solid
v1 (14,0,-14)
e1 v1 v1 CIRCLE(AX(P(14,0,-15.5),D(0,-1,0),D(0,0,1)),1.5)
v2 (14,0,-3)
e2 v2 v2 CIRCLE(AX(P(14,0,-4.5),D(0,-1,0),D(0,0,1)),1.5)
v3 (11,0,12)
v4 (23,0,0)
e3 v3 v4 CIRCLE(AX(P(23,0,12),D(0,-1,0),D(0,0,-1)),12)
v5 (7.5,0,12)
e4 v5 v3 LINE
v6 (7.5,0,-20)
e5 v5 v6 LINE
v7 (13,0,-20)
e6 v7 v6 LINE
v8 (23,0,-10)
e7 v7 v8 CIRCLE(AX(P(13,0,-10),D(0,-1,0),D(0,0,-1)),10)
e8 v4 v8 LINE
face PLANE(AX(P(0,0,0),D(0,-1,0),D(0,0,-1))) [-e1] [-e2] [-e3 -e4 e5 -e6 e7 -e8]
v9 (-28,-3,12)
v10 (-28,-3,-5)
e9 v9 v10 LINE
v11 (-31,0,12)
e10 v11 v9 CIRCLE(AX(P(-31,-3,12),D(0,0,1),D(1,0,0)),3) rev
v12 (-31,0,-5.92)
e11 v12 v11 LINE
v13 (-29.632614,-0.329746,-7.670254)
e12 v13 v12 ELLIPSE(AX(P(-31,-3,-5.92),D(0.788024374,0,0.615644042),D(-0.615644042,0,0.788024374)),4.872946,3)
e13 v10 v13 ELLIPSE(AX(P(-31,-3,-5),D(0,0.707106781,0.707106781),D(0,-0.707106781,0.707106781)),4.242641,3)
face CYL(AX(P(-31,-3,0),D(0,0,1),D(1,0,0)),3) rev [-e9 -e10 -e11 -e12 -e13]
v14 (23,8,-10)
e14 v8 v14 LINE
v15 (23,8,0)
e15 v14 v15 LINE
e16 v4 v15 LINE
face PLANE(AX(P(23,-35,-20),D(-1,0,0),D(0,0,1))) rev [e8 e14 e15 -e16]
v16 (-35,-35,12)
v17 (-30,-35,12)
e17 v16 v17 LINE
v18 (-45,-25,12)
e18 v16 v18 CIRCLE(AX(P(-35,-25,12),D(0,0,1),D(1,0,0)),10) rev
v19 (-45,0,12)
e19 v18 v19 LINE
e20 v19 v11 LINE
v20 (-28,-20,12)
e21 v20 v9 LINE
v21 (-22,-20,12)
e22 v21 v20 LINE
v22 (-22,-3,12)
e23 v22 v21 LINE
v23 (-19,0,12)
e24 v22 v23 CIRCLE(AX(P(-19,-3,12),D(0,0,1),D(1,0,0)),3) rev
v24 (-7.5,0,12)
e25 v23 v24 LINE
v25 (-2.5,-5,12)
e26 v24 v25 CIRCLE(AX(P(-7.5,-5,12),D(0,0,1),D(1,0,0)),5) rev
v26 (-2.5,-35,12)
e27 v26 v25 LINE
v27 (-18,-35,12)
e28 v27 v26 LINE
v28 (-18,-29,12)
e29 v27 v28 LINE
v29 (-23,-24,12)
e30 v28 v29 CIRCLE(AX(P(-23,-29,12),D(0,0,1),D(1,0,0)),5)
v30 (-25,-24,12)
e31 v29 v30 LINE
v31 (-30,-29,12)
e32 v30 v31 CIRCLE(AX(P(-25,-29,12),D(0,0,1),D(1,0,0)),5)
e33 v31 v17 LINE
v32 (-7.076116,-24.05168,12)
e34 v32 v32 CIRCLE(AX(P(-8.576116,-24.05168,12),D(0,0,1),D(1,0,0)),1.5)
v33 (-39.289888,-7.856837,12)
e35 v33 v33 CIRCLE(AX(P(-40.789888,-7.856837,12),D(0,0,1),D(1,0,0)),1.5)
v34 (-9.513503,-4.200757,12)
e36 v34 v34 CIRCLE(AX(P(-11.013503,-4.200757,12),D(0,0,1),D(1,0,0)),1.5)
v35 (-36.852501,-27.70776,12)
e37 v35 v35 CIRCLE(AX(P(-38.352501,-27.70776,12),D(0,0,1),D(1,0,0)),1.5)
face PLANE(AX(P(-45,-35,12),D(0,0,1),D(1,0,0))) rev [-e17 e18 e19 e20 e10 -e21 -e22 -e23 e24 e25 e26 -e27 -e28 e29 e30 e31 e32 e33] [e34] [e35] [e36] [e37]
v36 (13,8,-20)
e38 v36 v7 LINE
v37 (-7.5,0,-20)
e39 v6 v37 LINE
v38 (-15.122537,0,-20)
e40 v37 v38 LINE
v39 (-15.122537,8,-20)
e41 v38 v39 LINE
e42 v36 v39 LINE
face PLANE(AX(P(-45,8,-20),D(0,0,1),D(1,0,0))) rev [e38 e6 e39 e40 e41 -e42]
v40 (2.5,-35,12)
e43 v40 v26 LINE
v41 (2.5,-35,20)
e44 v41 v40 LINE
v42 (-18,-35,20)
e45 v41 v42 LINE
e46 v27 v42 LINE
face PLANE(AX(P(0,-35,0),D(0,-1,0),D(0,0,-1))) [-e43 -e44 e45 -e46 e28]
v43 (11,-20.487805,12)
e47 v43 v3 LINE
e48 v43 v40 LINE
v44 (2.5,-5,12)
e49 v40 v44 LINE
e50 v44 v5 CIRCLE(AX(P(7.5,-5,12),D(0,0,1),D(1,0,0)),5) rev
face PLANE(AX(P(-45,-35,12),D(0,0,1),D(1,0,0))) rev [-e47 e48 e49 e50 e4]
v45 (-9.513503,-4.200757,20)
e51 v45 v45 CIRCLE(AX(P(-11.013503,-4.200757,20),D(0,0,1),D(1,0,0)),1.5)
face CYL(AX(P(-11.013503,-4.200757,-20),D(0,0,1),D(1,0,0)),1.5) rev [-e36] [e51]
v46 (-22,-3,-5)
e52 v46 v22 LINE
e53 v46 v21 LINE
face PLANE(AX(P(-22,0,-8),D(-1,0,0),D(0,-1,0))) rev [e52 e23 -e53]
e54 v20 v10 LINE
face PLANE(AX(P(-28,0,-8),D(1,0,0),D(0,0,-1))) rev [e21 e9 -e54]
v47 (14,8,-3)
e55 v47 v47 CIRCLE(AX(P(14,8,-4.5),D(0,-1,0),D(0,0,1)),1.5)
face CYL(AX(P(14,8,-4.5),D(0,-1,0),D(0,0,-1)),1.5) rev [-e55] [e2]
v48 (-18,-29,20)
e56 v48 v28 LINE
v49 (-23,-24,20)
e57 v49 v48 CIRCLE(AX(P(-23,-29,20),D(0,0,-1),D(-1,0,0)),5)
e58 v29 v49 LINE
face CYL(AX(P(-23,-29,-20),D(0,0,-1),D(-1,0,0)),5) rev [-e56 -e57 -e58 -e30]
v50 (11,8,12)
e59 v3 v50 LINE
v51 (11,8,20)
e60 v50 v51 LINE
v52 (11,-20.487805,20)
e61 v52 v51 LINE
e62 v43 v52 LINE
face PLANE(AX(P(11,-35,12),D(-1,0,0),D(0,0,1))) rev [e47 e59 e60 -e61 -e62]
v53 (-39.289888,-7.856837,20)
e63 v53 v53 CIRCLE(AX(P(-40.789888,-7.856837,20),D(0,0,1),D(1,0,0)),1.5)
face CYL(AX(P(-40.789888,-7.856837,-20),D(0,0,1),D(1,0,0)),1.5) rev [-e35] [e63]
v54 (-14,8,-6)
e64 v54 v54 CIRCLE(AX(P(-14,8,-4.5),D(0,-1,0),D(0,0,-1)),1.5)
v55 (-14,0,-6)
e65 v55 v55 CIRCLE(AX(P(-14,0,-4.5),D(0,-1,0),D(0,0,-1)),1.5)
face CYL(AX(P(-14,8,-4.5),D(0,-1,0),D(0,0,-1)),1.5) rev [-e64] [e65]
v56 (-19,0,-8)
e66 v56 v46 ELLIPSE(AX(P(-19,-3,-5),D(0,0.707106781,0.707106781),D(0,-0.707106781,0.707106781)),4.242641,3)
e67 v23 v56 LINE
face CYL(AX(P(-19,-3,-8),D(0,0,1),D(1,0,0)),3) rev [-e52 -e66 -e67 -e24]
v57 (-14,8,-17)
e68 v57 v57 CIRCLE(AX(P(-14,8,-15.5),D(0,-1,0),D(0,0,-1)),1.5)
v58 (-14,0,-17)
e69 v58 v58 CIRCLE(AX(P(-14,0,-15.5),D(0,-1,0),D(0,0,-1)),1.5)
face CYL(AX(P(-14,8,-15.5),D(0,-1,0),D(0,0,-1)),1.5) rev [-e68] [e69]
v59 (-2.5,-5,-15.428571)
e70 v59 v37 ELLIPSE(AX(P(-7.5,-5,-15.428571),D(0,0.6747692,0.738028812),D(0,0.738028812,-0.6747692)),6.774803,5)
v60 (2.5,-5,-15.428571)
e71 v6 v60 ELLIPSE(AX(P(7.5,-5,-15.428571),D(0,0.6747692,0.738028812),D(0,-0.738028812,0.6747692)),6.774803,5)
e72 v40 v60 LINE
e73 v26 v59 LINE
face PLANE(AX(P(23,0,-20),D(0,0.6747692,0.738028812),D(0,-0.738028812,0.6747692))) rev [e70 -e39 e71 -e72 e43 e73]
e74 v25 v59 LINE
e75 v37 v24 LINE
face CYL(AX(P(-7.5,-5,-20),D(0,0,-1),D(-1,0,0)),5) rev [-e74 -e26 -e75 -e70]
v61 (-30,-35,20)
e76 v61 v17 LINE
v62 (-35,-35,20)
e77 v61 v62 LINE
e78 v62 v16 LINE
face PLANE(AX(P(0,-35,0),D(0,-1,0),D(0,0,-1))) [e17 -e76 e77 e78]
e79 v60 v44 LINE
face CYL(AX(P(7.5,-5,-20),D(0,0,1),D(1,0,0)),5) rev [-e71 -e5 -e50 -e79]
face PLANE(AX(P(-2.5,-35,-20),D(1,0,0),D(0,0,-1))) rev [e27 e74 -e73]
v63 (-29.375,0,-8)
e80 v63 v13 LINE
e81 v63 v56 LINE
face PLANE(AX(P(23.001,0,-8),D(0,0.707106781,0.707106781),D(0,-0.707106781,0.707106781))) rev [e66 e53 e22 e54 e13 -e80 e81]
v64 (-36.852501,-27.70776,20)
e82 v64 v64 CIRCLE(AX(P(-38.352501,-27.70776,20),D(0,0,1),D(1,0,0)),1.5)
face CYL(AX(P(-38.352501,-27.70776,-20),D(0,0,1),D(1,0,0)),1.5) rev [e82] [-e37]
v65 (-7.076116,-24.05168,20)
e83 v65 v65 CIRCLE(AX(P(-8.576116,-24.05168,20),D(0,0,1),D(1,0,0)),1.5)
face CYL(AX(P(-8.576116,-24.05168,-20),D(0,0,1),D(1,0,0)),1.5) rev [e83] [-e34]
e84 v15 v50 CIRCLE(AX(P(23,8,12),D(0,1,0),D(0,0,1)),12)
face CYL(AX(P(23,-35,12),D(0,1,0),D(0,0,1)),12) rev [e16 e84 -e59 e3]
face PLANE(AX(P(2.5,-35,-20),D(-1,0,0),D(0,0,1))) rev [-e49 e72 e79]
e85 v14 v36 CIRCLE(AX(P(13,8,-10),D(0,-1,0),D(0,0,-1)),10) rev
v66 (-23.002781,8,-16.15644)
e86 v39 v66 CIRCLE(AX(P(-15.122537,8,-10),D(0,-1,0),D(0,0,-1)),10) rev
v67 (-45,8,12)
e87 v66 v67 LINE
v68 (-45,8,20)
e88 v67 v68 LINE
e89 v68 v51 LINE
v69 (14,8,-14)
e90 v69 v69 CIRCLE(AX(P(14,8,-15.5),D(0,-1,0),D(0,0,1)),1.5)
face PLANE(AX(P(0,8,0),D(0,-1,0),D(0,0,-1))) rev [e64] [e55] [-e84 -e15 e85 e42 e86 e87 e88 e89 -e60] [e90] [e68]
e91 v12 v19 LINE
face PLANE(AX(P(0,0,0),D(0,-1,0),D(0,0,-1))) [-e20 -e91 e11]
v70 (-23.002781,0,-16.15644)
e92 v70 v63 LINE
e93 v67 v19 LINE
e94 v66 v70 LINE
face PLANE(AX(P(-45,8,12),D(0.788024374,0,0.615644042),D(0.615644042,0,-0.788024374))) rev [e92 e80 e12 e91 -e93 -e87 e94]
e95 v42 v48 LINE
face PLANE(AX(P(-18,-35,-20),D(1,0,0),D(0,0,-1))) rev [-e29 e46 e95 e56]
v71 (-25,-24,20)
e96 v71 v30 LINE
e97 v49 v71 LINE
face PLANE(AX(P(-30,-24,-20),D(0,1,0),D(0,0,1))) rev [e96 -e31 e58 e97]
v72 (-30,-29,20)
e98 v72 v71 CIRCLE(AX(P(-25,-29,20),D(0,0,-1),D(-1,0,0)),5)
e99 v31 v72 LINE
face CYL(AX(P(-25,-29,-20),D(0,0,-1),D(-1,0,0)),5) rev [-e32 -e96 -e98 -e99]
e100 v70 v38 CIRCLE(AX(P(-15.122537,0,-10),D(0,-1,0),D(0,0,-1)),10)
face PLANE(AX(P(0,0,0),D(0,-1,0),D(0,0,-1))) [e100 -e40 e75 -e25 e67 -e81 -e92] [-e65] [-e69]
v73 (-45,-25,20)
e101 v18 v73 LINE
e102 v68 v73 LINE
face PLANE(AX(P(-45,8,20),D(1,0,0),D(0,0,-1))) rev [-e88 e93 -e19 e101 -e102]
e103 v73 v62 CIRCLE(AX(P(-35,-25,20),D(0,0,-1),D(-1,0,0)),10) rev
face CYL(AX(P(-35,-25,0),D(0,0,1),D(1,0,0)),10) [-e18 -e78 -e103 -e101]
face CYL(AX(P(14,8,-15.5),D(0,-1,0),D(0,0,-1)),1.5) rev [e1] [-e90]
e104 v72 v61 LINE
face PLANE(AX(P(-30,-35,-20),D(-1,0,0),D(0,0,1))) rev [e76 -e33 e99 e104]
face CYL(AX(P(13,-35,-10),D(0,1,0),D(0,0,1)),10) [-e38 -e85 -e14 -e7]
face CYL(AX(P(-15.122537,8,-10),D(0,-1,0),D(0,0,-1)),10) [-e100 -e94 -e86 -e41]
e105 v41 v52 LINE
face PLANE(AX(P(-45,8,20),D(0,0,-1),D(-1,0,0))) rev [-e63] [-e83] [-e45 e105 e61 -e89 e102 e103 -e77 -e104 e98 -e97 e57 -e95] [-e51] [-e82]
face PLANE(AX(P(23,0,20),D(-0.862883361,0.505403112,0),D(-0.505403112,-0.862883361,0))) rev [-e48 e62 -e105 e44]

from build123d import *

# Parameters (mm, degrees)
SKETCH_1_W                = 90
SKETCH_1_H                = 40
EXTRUDE_1_DEPTH           = 8
SKETCH_2_R                = 1.5
CUT_EXTRUDE_1_DEPTH       = 50.889878733
SKETCH_3_W                = 90
SKETCH_3_H                = 8
EXTRUDE_2_DEPTH           = 35
CUT_EXTRUDE_3_DEPTH       = 61.415229868
SKETCH_7_W                = 22
SKETCH_7_H                = 40
CUT_EXTRUDE_4_DEPTH       = 66.375836515
SKETCH_8_W                = 5
SKETCH_8_H                = 32
EXTRUDE_3_DEPTH           = 35
CUT_EXTRUDE_5_DEPTH       = 59.576872569
SKETCH_14_R               = 1.5
CUT_EXTRUDE_8_DEPTH       = 70.641941386
SKETCH_15_W               = 12
SKETCH_15_H               = 11
CUT_EXTRUDE_10_DEPTH      = 70.641941386
FILLET_2_R                = 5
FILLET_5_R                = 5
CUT_EXTRUDE_11_DEPTH      = 66.375836515
CUT_EXTRUDE_11_DEPTH_BACK = 66.375836515
FILLET_4_R                = 10
CUT_EXTRUDE_12_DEPTH      = 66.375836515
SKETCH_19_W               = 6
SKETCH_19_H               = 20
EXTRUDE_4_DEPTH           = 20
CUT_EXTRUDE_13_REACH      = 67.008
FILLET_6_R                = 3


with BuildPart() as part:
    # 草图1 → 凸台-拉伸1 (new body)
    with BuildSketch(Plane(origin=(0, 0, 0), x_dir=(1, 0, 0), z_dir=(0, 1, 0))):
        Rectangle(SKETCH_1_W, SKETCH_1_H)
    extrude(amount=EXTRUDE_1_DEPTH)

    # 草图2 → 切除-拉伸1 (cut, through all)
    with BuildSketch(Plane.XZ):
        with Locations(Location((-14, -4.5, 0), (0, 0, 270))):
            Circle(SKETCH_2_R)
        with Locations(Location((-14, -15.5, 0), (0, 0, 270))):
            Circle(SKETCH_2_R)
        with Locations(Location((14, -15.5, 0), (0, 0, 90))):
            Circle(SKETCH_2_R)
        with Locations(Location((14, -4.5, 0), (0, 0, 90))):
            Circle(SKETCH_2_R)
    extrude(amount=-CUT_EXTRUDE_1_DEPTH, mode=Mode.SUBTRACT)

    # 草图3 → 凸台-拉伸2 (add)
    with BuildSketch(Plane.XZ):
        with Locations((0, 16)):
            Rectangle(SKETCH_3_W, SKETCH_3_H)
    extrude(amount=EXTRUDE_2_DEPTH)

    # 草图6 → 切除-拉伸3 (cut, through all)
    with BuildSketch(Plane.XZ):
        Polygon((-45, 12), (-20, -20), (-45, -20), align=None)
    extrude(amount=-CUT_EXTRUDE_3_DEPTH, mode=Mode.SUBTRACT)

    # 草图7 → 切除-拉伸4 (cut, through all)
    with BuildSketch(Plane(origin=(0, 8, 0), x_dir=(1, 0, 0), z_dir=(0, 1, 0))):
        with Locations((34, 0)):
            Rectangle(SKETCH_7_W, SKETCH_7_H)
    extrude(amount=-CUT_EXTRUDE_4_DEPTH, mode=Mode.SUBTRACT)

    # 草图8 → 凸台-拉伸3 (add)
    with BuildSketch(Plane.XZ):
        with Locations((0, -4)):
            Rectangle(SKETCH_8_W, SKETCH_8_H)
    extrude(amount=EXTRUDE_3_DEPTH)

    # 草图9 → 切除-拉伸5 (cut, through all)
    with BuildSketch(Plane.ZY.offset(2.5)):
        Polygon((-20, 0), (12, -35), (-20, -35), align=None)
    extrude(amount=-CUT_EXTRUDE_5_DEPTH, mode=Mode.SUBTRACT)

    # 草图14 → 切除-拉伸8 (cut, through all)
    with BuildSketch(Plane.XY.offset(20)):
        with Locations((-8.576116211, -24.051679616)):
            Circle(SKETCH_14_R)
        with Locations((-38.352500761, -27.707759918)):
            Circle(SKETCH_14_R)
        with Locations((-40.789887629, -7.856836885)):
            Circle(SKETCH_14_R)
        with Locations((-11.013503079, -4.200756583)):
            Circle(SKETCH_14_R)
    extrude(amount=-CUT_EXTRUDE_8_DEPTH, mode=Mode.SUBTRACT)

    # 草图15 → 切除-拉伸10 (cut, through all)
    with BuildSketch(Plane.XY.offset(20)):
        with Locations((-24, -29.5)):
            Rectangle(SKETCH_15_W, SKETCH_15_H)
    extrude(amount=-CUT_EXTRUDE_10_DEPTH, mode=Mode.SUBTRACT)

    # 圆角2
    fillet_2_edges = [part.edges().sort_by_distance(p)[0] for p in [
        (-30, -24, 16),
        (-18, -24, 16),
    ]]
    fillet(fillet_2_edges, radius=FILLET_2_R)

    # 圆角5
    fillet_5_edges = [part.edges().sort_by_distance(p)[0] for p in [
        (2.5, 0, -4),
        (-2.5, 0, -4),
    ]]
    fillet(fillet_5_edges, radius=FILLET_5_R)

    # 草图16 → 切除-拉伸11 (cut, two sides: drawn at the far end of the back side and taken through both)
    with BuildSketch(Plane(origin=(0, 0, 12), x_dir=(-1, 0, 0), z_dir=(0, 0, -1)).offset(-CUT_EXTRUDE_11_DEPTH_BACK)):
        Polygon((-23, 0), (-2.5, -35), (-23, -35), align=None)
    extrude(amount=CUT_EXTRUDE_11_DEPTH + CUT_EXTRUDE_11_DEPTH_BACK, mode=Mode.SUBTRACT)

    # 圆角4
    fillet_4_edges = [part.edges().sort_by_distance(p)[0] for p in [
        (-45, -35, 16),
        (-20, 4, -20),
        (23, 4, -20),
    ]]
    fillet(fillet_4_edges, radius=FILLET_4_R)

    # 草图18 → 切除-拉伸12 (cut, through all)
    with BuildSketch(Plane(origin=(0, 8, 0), x_dir=(1, 0, 0), z_dir=(0, 1, 0))):
        with BuildLine():
            Line((11, -12), (11, -20))
            Line((11, -20), (23, -20))
            Line((23, -20), (23, -12))
            Line((23, -12), (23, 0))
            ThreePointArc((23, 0), (14.514718626, -3.514718626), (11, -12))
        make_face()
    extrude(amount=-CUT_EXTRUDE_12_DEPTH, mode=Mode.SUBTRACT)

    # 草图19 → 凸台-拉伸4 (add)
    with BuildSketch(Plane(origin=(0, 0, 12), x_dir=(-1, 0, 0), z_dir=(0, 0, -1))):
        with Locations((25, -10)):
            Rectangle(SKETCH_19_W, SKETCH_19_H)
    extrude(amount=EXTRUDE_4_DEPTH)

    # 草图20 → 切除-拉伸13 (cut, up to next)
    with BuildSketch(Plane.ZY.offset(28), mode=Mode.PRIVATE) as cut_extrude_13_sk1:
        Polygon((-8, 0), (12, -20), (-8, -20), align=None)
    cut_extrude_13_tool1 = extrude(cut_extrude_13_sk1.sketch, amount=-CUT_EXTRUDE_13_REACH, mode=Mode.PRIVATE) & part.part
    add(cut_extrude_13_tool1.solids().sort_by_distance((-28, -13.333333, -1.333333))[0], mode=Mode.SUBTRACT)

    # 圆角6
    # the kernel refuses this fillet: 3 mm, written as the material it adds along each edge
    with BuildSketch(Plane(origin=(-22, 0, 19.5), x_dir=(1, 0, 0), z_dir=(0, 0, -1))) as fillet_6_piece_1_section:
        with BuildLine():
            CenterArc((FILLET_6_R, FILLET_6_R), FILLET_6_R, 180, 90)
            Line((0, FILLET_6_R), (0, 0))
            Line((0, 0), (FILLET_6_R, 0))
        make_face()
    fillet_6_piece_1 = extrude(amount=35, mode=Mode.PRIVATE)
    fillet_6_piece_1 = split(fillet_6_piece_1, bisect_by=Plane(origin=(-21.320814657, -12.214592671, 4.214592671), z_dir=(0, 0.7071067811865476, 0.7071067811865476)), keep=Keep.TOP, mode=Mode.PRIVATE)
    add(fillet_6_piece_1)
    with BuildSketch(Plane(origin=(-28, 0, 19.5), x_dir=(-1, 0, 0), z_dir=(0, 0, -1))) as fillet_6_piece_2_section:
        with BuildLine():
            CenterArc((FILLET_6_R, -FILLET_6_R), FILLET_6_R, 90, 90)
            Line((0, -FILLET_6_R), (0, 0))
            Line((0, 0), (FILLET_6_R, 0))
        make_face()
    fillet_6_piece_2 = extrude(amount=35, mode=Mode.PRIVATE)
    fillet_6_piece_2 = split(fillet_6_piece_2, bisect_by=Plane(origin=(-28.679185343, -12.214592671, 4.214592671), z_dir=(0, 0.7071067811865476, 0.7071067811865476)), keep=Keep.TOP, mode=Mode.PRIVATE)
    fillet_6_piece_2 = split(fillet_6_piece_2, bisect_by=Plane(origin=(-40.633408635, -0.679185343, 6.410763053), z_dir=(0.7880243737245634, 0, 0.6156440419723153)), keep=Keep.TOP, mode=Mode.PRIVATE)
    add(fillet_6_piece_2)


solid = part.part
